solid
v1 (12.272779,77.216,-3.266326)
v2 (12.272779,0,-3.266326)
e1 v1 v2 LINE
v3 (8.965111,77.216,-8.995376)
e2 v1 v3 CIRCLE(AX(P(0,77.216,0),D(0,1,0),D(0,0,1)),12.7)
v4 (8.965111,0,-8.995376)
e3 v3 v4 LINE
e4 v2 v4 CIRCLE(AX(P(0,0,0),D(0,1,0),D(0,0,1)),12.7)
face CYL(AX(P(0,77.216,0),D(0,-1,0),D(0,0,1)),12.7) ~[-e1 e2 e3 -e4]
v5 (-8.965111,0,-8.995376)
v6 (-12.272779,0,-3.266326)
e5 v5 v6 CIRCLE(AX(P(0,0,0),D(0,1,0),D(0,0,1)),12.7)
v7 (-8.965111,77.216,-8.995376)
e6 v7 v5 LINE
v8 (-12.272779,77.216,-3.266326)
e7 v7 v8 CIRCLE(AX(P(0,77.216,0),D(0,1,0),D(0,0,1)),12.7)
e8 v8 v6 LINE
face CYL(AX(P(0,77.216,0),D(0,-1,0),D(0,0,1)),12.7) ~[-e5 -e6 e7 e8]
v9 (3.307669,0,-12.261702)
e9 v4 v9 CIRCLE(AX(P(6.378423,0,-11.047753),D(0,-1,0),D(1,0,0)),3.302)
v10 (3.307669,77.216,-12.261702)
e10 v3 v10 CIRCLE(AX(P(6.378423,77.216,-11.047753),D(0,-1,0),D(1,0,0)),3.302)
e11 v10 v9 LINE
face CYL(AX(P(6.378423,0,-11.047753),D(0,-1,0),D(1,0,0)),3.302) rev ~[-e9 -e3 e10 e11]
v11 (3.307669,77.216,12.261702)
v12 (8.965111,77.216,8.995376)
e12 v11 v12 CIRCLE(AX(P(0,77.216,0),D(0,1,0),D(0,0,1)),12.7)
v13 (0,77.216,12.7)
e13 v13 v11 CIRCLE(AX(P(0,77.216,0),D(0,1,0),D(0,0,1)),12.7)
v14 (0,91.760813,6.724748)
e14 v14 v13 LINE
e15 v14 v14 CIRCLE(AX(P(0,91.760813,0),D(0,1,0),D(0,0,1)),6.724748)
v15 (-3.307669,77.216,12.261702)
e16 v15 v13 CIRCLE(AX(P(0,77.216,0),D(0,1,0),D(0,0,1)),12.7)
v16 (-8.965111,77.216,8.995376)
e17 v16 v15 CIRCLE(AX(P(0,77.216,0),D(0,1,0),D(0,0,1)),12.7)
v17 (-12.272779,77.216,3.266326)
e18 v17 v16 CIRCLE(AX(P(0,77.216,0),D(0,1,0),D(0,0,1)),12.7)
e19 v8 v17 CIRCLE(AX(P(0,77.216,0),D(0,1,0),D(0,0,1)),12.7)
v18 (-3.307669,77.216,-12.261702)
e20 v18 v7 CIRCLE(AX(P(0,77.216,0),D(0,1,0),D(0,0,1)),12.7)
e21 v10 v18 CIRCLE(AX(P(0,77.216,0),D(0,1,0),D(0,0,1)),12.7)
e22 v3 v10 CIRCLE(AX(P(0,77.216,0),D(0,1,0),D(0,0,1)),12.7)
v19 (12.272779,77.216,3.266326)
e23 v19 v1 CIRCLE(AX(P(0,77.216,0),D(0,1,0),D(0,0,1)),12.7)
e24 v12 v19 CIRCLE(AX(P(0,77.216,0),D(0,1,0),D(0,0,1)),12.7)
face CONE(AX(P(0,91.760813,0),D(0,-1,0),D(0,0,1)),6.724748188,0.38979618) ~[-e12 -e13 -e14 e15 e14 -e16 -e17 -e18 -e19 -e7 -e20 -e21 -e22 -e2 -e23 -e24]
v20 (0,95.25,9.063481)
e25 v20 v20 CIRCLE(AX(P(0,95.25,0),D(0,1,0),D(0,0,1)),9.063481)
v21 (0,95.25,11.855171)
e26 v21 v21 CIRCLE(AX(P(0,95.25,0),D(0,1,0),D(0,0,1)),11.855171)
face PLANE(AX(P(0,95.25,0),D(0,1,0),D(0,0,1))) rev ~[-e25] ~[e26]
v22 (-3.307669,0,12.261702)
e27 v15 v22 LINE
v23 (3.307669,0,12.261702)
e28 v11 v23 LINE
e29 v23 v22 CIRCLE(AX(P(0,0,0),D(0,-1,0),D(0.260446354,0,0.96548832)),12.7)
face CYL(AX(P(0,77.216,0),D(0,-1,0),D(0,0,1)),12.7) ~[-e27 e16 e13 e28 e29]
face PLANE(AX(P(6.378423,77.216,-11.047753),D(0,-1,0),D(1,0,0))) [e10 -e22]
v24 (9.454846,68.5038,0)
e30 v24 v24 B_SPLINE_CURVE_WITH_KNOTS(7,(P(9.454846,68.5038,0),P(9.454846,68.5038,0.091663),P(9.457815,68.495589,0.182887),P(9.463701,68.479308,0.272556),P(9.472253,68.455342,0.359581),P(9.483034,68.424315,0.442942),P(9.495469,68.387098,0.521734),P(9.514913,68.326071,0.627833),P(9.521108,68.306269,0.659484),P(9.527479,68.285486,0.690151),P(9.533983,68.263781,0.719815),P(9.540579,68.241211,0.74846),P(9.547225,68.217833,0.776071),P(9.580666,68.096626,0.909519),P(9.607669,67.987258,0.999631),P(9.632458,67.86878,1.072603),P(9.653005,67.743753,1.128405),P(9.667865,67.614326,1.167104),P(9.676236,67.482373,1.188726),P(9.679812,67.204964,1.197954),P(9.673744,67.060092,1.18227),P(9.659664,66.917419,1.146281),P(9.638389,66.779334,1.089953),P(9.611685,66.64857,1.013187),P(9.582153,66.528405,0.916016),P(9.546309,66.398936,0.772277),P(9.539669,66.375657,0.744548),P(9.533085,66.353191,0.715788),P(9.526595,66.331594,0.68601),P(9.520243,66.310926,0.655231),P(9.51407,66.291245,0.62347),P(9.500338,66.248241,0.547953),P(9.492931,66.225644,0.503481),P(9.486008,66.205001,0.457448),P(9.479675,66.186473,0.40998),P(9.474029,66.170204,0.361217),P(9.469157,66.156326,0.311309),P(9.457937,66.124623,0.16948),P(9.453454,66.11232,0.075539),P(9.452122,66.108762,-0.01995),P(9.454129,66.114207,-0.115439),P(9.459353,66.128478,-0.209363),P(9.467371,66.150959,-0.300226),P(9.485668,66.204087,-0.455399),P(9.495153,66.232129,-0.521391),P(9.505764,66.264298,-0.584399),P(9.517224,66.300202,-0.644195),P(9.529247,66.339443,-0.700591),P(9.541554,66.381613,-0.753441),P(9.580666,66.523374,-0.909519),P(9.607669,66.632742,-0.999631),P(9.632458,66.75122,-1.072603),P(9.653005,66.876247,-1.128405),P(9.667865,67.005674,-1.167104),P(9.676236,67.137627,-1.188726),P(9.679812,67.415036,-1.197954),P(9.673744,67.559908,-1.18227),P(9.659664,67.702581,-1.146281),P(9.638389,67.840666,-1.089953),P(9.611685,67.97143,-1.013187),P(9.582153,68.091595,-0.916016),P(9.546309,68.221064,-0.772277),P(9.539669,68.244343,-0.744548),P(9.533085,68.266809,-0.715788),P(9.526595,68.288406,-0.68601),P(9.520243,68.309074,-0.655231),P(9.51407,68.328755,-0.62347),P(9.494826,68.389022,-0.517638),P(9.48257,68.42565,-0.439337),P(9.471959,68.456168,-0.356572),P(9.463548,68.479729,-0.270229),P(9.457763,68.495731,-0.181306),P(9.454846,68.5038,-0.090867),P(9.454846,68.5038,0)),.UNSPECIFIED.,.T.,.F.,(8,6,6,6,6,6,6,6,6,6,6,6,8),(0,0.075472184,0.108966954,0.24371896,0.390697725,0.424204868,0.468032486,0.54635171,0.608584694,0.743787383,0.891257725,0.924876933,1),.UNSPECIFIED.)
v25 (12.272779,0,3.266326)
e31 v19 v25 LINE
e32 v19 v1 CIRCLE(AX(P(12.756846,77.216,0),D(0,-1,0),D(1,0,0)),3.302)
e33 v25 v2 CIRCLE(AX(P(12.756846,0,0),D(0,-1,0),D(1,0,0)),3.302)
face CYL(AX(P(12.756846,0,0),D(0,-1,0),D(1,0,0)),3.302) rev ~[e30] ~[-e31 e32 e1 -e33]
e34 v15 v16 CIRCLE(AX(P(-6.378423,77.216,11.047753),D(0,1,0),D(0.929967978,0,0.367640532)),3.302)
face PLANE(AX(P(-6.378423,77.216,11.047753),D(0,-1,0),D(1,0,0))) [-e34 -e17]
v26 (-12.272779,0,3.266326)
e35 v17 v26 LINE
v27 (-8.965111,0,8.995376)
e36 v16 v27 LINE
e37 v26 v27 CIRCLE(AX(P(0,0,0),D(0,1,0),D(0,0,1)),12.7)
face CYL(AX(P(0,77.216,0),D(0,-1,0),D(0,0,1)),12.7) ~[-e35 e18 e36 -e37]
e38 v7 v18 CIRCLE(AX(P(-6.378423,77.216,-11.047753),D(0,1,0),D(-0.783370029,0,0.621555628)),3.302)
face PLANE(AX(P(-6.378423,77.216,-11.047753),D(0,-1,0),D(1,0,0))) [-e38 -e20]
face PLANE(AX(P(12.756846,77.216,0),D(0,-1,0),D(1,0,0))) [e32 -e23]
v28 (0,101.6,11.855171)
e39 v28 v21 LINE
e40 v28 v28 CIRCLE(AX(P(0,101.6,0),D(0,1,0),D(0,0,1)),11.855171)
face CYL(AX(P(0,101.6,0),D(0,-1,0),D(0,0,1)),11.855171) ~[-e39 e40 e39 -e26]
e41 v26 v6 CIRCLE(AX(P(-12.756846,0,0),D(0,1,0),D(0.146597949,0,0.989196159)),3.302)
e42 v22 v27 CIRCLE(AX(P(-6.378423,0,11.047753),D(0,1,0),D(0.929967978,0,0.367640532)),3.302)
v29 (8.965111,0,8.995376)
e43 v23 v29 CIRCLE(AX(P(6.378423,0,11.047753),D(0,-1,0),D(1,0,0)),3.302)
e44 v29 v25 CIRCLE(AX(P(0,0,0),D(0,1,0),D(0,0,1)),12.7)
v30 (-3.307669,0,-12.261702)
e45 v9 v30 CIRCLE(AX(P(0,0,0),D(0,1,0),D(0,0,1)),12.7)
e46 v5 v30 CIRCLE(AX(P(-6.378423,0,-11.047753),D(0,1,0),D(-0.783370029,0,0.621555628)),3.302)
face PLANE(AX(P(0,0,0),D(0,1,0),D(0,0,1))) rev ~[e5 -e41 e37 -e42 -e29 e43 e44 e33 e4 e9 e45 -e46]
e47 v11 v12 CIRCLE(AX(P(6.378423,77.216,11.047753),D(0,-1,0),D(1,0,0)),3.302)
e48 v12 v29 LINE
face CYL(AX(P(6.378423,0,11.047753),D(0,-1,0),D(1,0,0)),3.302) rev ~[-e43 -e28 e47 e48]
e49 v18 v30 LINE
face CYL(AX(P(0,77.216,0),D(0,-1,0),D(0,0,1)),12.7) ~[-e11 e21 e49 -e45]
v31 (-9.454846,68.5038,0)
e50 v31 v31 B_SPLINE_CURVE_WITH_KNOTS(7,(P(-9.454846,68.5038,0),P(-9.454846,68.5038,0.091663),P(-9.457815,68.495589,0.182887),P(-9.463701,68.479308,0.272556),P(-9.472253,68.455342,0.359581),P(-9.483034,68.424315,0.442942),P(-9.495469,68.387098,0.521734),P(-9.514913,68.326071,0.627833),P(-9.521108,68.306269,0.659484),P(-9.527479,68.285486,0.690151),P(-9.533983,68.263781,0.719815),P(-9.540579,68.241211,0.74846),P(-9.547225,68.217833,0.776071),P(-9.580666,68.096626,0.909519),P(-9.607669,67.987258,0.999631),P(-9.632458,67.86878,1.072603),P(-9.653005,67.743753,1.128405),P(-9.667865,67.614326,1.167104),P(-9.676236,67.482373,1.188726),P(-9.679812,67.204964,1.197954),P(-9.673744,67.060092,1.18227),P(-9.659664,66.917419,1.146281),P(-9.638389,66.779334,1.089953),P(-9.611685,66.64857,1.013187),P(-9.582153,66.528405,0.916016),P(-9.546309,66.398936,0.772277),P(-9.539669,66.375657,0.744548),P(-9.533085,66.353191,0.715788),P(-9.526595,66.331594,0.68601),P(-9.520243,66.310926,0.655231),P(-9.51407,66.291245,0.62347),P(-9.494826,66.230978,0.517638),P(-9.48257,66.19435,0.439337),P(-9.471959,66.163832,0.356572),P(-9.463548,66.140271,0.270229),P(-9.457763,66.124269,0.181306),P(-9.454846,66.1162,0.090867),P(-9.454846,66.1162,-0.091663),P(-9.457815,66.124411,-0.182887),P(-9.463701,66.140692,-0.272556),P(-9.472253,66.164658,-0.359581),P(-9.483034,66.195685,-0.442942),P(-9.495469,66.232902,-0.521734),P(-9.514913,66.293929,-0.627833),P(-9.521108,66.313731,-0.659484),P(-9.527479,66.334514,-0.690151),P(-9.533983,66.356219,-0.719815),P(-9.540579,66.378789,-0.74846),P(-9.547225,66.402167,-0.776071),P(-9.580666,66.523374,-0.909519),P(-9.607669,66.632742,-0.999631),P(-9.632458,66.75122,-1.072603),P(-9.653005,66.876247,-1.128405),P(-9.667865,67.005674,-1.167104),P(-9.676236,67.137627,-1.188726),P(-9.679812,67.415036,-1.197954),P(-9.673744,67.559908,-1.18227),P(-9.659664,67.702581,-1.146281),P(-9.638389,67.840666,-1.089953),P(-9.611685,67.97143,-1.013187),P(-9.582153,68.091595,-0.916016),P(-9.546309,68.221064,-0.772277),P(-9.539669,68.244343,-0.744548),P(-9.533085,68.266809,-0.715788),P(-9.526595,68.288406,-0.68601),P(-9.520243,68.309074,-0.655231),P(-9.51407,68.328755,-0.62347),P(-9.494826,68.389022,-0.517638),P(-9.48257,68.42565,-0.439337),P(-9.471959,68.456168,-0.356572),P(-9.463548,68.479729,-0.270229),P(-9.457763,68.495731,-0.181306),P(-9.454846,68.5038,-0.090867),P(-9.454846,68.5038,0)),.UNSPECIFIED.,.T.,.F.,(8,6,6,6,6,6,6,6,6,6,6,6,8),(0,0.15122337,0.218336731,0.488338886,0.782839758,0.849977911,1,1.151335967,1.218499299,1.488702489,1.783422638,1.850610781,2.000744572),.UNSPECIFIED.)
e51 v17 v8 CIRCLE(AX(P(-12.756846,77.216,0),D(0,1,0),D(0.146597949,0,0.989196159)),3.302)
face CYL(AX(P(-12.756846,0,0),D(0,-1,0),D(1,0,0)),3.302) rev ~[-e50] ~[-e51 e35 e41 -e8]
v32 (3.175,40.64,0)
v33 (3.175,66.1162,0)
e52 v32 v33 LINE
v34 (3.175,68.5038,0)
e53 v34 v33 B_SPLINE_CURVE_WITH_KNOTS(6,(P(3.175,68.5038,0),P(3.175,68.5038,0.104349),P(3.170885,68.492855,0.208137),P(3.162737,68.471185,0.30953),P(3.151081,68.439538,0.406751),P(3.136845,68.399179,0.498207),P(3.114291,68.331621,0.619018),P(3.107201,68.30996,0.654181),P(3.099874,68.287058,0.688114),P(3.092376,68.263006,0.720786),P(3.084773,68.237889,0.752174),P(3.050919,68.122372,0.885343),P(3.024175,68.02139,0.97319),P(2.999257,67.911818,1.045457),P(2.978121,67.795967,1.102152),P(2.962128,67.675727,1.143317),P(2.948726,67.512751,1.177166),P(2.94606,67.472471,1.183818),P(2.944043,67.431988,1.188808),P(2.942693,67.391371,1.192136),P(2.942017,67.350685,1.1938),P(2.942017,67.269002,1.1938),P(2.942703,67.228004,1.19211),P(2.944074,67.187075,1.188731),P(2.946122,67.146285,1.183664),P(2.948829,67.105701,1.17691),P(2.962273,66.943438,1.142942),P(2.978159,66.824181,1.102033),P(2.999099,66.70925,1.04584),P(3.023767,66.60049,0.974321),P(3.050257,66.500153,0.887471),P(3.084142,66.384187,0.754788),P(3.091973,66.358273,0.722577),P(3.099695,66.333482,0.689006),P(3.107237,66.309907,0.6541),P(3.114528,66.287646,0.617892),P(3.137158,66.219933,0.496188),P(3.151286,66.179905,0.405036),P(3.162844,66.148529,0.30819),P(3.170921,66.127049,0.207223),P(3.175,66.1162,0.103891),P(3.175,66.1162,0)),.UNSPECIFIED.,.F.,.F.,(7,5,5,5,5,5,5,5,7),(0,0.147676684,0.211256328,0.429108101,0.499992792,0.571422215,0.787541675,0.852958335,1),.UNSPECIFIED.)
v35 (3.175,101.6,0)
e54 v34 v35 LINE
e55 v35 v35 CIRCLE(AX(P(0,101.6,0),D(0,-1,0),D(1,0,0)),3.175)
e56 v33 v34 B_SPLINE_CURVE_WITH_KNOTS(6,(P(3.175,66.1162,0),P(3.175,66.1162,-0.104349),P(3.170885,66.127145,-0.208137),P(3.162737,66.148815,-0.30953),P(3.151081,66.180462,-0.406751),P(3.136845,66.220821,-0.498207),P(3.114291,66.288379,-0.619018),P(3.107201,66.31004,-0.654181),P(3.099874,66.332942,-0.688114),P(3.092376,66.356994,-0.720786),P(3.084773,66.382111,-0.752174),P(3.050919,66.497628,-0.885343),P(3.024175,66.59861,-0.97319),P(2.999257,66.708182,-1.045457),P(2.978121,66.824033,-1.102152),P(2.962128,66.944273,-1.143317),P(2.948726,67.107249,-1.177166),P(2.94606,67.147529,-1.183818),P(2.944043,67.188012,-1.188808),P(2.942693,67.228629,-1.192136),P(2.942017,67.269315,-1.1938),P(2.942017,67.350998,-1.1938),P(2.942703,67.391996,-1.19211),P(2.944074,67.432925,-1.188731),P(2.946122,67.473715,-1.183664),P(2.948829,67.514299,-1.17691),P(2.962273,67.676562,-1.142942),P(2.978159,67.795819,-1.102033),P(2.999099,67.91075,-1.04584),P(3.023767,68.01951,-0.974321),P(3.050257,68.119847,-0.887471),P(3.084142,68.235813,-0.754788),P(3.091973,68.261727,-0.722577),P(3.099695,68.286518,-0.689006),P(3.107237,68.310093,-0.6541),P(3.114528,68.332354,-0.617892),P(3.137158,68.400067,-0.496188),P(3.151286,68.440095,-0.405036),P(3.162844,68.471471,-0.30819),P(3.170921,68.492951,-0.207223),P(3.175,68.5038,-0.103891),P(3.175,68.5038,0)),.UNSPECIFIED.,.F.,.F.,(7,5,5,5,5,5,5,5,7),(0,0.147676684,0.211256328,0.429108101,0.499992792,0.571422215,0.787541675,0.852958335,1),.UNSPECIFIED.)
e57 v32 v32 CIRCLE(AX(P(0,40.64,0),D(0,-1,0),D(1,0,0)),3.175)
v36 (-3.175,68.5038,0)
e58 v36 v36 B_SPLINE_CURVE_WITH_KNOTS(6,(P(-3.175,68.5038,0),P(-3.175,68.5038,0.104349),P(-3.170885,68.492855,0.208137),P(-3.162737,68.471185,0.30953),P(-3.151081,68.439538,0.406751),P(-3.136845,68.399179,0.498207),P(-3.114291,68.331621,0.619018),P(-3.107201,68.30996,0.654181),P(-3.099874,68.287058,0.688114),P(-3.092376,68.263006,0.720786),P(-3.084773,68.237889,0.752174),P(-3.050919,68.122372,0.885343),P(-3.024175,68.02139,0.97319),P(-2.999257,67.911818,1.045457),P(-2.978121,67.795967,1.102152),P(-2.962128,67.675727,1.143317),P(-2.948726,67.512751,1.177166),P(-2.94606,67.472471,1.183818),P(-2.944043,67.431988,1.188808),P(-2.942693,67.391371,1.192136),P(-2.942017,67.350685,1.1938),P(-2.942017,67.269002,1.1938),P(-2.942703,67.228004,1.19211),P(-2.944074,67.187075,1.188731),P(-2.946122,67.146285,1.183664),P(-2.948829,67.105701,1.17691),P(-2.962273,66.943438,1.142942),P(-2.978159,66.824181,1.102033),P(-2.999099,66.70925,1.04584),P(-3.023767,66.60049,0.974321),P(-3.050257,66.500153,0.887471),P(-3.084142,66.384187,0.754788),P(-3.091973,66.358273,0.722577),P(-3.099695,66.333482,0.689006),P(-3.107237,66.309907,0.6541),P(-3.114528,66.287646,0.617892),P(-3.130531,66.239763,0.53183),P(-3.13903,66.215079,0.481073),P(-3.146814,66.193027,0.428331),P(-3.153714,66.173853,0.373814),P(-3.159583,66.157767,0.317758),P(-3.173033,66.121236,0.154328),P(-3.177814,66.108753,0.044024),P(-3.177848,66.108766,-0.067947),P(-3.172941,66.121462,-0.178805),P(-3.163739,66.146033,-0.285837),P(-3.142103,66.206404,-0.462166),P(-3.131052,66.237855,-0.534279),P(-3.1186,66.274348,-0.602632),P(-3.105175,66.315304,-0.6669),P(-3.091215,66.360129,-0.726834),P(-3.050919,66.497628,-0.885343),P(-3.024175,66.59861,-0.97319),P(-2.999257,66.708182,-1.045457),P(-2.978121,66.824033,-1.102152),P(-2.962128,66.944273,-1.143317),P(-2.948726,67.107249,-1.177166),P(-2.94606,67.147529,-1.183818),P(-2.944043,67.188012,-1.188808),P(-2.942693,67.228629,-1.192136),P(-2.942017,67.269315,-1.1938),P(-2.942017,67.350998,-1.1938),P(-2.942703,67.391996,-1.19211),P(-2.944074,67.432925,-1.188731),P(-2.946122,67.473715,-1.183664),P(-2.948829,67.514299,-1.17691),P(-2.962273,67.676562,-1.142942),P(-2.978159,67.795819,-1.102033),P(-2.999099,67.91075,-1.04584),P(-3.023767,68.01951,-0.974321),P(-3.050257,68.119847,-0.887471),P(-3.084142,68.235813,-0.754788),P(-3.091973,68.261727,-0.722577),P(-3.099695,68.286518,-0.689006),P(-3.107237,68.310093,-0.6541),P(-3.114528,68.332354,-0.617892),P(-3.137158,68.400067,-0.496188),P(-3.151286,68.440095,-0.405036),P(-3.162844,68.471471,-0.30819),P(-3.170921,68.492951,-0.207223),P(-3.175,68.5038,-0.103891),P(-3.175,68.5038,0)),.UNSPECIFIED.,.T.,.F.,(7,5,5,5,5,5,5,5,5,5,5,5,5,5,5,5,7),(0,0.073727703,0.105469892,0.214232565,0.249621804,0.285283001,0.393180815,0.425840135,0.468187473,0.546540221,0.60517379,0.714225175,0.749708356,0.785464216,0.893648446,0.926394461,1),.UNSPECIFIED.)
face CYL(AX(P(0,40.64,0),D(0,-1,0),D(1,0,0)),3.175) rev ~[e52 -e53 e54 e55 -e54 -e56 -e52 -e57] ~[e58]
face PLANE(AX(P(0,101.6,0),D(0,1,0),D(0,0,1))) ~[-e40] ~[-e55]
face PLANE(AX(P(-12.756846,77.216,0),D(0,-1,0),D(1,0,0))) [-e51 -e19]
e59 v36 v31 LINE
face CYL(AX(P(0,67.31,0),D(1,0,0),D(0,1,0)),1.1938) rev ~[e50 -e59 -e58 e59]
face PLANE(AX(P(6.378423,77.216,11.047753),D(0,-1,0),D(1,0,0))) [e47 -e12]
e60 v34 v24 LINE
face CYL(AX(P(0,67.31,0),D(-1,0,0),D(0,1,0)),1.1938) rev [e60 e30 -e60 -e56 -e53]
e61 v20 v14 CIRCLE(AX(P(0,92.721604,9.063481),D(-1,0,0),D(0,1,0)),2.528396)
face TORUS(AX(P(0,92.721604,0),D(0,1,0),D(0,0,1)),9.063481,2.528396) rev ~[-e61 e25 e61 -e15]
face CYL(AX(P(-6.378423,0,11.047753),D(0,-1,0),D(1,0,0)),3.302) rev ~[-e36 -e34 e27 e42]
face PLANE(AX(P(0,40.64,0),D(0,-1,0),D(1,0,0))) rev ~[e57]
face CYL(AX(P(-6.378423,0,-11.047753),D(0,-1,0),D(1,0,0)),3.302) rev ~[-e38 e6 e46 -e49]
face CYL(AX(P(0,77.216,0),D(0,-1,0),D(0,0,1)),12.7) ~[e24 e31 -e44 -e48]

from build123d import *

# Parameters (mm, degrees)
F2_R          = 3.302
F3_DEPTH      = 77.216
F5_START      = -40.64
F4_R          = 3.175
F5_DEPTH      = 60.961
F6_R          = 1.1938
F7_DEPTH      = 25.4
F7_DEPTH_BACK = 25.4


# Not quite as in the source:
# - a feature names something its author has since deleted; it is built from what else it names


with BuildPart() as f1:
    # F0 (on Right) → F1 (revolve)
    with BuildSketch(Plane.YZ):
        with BuildLine():
            Line((0, 12.7), (0, 0))
            Line((0, 0), (101.6, 0))
            Line((101.6, 0), (101.6, 11.8551712597))
            Line((101.6, 11.8551712597), (95.25, 11.8551712597))
            Line((95.25, 11.8551712597), (95.25, 9.0634808418))
            ThreePointArc((95.25, 9.0634808418), (94.1293552402, 6.9632371008), (91.7608131807, 6.7247481879))
            Line((91.7608131807, 6.7247481879), (77.216, 12.7))
            Line((77.216, 12.7), (0, 12.7))
        make_face()
    revolve(axis=Axis((0, 50.8, 0), (0, 1, 0)))

    # F2 (on Front) → F3 (cut)
    with BuildSketch(Plane.XZ):
        with Locations((12.7568459138, 0)):
            Circle(F2_R)
        with Locations((6.3784229569, 11.0477526335)):
            Circle(F2_R)
        with Locations((-6.3784229569, 11.0477526335)):
            Circle(F2_R)
        with Locations((-12.7568459138, 0)):
            Circle(F2_R)
        with Locations((-6.3784229569, -11.0477526335)):
            Circle(F2_R)
        with Locations((6.3784229569, -11.0477526335)):
            Circle(F2_R)
    extrude(amount=-F3_DEPTH, mode=Mode.SUBTRACT)

    # F4 (on Front) → F5 (cut)
    with BuildSketch(Plane.XZ.offset(F5_START)):
        Circle(F4_R)
    extrude(amount=-F5_DEPTH, mode=Mode.SUBTRACT)

    # F6 (on Right) → F7 (cut, two sides)
    with BuildSketch(Plane.YZ) as f7_sk:
        with Locations((67.31, 0)):
            Circle(F6_R)
    extrude(amount=-F7_DEPTH, mode=Mode.SUBTRACT)
    extrude(f7_sk.sketch, amount=F7_DEPTH_BACK, mode=Mode.SUBTRACT)


solid = f1.part
